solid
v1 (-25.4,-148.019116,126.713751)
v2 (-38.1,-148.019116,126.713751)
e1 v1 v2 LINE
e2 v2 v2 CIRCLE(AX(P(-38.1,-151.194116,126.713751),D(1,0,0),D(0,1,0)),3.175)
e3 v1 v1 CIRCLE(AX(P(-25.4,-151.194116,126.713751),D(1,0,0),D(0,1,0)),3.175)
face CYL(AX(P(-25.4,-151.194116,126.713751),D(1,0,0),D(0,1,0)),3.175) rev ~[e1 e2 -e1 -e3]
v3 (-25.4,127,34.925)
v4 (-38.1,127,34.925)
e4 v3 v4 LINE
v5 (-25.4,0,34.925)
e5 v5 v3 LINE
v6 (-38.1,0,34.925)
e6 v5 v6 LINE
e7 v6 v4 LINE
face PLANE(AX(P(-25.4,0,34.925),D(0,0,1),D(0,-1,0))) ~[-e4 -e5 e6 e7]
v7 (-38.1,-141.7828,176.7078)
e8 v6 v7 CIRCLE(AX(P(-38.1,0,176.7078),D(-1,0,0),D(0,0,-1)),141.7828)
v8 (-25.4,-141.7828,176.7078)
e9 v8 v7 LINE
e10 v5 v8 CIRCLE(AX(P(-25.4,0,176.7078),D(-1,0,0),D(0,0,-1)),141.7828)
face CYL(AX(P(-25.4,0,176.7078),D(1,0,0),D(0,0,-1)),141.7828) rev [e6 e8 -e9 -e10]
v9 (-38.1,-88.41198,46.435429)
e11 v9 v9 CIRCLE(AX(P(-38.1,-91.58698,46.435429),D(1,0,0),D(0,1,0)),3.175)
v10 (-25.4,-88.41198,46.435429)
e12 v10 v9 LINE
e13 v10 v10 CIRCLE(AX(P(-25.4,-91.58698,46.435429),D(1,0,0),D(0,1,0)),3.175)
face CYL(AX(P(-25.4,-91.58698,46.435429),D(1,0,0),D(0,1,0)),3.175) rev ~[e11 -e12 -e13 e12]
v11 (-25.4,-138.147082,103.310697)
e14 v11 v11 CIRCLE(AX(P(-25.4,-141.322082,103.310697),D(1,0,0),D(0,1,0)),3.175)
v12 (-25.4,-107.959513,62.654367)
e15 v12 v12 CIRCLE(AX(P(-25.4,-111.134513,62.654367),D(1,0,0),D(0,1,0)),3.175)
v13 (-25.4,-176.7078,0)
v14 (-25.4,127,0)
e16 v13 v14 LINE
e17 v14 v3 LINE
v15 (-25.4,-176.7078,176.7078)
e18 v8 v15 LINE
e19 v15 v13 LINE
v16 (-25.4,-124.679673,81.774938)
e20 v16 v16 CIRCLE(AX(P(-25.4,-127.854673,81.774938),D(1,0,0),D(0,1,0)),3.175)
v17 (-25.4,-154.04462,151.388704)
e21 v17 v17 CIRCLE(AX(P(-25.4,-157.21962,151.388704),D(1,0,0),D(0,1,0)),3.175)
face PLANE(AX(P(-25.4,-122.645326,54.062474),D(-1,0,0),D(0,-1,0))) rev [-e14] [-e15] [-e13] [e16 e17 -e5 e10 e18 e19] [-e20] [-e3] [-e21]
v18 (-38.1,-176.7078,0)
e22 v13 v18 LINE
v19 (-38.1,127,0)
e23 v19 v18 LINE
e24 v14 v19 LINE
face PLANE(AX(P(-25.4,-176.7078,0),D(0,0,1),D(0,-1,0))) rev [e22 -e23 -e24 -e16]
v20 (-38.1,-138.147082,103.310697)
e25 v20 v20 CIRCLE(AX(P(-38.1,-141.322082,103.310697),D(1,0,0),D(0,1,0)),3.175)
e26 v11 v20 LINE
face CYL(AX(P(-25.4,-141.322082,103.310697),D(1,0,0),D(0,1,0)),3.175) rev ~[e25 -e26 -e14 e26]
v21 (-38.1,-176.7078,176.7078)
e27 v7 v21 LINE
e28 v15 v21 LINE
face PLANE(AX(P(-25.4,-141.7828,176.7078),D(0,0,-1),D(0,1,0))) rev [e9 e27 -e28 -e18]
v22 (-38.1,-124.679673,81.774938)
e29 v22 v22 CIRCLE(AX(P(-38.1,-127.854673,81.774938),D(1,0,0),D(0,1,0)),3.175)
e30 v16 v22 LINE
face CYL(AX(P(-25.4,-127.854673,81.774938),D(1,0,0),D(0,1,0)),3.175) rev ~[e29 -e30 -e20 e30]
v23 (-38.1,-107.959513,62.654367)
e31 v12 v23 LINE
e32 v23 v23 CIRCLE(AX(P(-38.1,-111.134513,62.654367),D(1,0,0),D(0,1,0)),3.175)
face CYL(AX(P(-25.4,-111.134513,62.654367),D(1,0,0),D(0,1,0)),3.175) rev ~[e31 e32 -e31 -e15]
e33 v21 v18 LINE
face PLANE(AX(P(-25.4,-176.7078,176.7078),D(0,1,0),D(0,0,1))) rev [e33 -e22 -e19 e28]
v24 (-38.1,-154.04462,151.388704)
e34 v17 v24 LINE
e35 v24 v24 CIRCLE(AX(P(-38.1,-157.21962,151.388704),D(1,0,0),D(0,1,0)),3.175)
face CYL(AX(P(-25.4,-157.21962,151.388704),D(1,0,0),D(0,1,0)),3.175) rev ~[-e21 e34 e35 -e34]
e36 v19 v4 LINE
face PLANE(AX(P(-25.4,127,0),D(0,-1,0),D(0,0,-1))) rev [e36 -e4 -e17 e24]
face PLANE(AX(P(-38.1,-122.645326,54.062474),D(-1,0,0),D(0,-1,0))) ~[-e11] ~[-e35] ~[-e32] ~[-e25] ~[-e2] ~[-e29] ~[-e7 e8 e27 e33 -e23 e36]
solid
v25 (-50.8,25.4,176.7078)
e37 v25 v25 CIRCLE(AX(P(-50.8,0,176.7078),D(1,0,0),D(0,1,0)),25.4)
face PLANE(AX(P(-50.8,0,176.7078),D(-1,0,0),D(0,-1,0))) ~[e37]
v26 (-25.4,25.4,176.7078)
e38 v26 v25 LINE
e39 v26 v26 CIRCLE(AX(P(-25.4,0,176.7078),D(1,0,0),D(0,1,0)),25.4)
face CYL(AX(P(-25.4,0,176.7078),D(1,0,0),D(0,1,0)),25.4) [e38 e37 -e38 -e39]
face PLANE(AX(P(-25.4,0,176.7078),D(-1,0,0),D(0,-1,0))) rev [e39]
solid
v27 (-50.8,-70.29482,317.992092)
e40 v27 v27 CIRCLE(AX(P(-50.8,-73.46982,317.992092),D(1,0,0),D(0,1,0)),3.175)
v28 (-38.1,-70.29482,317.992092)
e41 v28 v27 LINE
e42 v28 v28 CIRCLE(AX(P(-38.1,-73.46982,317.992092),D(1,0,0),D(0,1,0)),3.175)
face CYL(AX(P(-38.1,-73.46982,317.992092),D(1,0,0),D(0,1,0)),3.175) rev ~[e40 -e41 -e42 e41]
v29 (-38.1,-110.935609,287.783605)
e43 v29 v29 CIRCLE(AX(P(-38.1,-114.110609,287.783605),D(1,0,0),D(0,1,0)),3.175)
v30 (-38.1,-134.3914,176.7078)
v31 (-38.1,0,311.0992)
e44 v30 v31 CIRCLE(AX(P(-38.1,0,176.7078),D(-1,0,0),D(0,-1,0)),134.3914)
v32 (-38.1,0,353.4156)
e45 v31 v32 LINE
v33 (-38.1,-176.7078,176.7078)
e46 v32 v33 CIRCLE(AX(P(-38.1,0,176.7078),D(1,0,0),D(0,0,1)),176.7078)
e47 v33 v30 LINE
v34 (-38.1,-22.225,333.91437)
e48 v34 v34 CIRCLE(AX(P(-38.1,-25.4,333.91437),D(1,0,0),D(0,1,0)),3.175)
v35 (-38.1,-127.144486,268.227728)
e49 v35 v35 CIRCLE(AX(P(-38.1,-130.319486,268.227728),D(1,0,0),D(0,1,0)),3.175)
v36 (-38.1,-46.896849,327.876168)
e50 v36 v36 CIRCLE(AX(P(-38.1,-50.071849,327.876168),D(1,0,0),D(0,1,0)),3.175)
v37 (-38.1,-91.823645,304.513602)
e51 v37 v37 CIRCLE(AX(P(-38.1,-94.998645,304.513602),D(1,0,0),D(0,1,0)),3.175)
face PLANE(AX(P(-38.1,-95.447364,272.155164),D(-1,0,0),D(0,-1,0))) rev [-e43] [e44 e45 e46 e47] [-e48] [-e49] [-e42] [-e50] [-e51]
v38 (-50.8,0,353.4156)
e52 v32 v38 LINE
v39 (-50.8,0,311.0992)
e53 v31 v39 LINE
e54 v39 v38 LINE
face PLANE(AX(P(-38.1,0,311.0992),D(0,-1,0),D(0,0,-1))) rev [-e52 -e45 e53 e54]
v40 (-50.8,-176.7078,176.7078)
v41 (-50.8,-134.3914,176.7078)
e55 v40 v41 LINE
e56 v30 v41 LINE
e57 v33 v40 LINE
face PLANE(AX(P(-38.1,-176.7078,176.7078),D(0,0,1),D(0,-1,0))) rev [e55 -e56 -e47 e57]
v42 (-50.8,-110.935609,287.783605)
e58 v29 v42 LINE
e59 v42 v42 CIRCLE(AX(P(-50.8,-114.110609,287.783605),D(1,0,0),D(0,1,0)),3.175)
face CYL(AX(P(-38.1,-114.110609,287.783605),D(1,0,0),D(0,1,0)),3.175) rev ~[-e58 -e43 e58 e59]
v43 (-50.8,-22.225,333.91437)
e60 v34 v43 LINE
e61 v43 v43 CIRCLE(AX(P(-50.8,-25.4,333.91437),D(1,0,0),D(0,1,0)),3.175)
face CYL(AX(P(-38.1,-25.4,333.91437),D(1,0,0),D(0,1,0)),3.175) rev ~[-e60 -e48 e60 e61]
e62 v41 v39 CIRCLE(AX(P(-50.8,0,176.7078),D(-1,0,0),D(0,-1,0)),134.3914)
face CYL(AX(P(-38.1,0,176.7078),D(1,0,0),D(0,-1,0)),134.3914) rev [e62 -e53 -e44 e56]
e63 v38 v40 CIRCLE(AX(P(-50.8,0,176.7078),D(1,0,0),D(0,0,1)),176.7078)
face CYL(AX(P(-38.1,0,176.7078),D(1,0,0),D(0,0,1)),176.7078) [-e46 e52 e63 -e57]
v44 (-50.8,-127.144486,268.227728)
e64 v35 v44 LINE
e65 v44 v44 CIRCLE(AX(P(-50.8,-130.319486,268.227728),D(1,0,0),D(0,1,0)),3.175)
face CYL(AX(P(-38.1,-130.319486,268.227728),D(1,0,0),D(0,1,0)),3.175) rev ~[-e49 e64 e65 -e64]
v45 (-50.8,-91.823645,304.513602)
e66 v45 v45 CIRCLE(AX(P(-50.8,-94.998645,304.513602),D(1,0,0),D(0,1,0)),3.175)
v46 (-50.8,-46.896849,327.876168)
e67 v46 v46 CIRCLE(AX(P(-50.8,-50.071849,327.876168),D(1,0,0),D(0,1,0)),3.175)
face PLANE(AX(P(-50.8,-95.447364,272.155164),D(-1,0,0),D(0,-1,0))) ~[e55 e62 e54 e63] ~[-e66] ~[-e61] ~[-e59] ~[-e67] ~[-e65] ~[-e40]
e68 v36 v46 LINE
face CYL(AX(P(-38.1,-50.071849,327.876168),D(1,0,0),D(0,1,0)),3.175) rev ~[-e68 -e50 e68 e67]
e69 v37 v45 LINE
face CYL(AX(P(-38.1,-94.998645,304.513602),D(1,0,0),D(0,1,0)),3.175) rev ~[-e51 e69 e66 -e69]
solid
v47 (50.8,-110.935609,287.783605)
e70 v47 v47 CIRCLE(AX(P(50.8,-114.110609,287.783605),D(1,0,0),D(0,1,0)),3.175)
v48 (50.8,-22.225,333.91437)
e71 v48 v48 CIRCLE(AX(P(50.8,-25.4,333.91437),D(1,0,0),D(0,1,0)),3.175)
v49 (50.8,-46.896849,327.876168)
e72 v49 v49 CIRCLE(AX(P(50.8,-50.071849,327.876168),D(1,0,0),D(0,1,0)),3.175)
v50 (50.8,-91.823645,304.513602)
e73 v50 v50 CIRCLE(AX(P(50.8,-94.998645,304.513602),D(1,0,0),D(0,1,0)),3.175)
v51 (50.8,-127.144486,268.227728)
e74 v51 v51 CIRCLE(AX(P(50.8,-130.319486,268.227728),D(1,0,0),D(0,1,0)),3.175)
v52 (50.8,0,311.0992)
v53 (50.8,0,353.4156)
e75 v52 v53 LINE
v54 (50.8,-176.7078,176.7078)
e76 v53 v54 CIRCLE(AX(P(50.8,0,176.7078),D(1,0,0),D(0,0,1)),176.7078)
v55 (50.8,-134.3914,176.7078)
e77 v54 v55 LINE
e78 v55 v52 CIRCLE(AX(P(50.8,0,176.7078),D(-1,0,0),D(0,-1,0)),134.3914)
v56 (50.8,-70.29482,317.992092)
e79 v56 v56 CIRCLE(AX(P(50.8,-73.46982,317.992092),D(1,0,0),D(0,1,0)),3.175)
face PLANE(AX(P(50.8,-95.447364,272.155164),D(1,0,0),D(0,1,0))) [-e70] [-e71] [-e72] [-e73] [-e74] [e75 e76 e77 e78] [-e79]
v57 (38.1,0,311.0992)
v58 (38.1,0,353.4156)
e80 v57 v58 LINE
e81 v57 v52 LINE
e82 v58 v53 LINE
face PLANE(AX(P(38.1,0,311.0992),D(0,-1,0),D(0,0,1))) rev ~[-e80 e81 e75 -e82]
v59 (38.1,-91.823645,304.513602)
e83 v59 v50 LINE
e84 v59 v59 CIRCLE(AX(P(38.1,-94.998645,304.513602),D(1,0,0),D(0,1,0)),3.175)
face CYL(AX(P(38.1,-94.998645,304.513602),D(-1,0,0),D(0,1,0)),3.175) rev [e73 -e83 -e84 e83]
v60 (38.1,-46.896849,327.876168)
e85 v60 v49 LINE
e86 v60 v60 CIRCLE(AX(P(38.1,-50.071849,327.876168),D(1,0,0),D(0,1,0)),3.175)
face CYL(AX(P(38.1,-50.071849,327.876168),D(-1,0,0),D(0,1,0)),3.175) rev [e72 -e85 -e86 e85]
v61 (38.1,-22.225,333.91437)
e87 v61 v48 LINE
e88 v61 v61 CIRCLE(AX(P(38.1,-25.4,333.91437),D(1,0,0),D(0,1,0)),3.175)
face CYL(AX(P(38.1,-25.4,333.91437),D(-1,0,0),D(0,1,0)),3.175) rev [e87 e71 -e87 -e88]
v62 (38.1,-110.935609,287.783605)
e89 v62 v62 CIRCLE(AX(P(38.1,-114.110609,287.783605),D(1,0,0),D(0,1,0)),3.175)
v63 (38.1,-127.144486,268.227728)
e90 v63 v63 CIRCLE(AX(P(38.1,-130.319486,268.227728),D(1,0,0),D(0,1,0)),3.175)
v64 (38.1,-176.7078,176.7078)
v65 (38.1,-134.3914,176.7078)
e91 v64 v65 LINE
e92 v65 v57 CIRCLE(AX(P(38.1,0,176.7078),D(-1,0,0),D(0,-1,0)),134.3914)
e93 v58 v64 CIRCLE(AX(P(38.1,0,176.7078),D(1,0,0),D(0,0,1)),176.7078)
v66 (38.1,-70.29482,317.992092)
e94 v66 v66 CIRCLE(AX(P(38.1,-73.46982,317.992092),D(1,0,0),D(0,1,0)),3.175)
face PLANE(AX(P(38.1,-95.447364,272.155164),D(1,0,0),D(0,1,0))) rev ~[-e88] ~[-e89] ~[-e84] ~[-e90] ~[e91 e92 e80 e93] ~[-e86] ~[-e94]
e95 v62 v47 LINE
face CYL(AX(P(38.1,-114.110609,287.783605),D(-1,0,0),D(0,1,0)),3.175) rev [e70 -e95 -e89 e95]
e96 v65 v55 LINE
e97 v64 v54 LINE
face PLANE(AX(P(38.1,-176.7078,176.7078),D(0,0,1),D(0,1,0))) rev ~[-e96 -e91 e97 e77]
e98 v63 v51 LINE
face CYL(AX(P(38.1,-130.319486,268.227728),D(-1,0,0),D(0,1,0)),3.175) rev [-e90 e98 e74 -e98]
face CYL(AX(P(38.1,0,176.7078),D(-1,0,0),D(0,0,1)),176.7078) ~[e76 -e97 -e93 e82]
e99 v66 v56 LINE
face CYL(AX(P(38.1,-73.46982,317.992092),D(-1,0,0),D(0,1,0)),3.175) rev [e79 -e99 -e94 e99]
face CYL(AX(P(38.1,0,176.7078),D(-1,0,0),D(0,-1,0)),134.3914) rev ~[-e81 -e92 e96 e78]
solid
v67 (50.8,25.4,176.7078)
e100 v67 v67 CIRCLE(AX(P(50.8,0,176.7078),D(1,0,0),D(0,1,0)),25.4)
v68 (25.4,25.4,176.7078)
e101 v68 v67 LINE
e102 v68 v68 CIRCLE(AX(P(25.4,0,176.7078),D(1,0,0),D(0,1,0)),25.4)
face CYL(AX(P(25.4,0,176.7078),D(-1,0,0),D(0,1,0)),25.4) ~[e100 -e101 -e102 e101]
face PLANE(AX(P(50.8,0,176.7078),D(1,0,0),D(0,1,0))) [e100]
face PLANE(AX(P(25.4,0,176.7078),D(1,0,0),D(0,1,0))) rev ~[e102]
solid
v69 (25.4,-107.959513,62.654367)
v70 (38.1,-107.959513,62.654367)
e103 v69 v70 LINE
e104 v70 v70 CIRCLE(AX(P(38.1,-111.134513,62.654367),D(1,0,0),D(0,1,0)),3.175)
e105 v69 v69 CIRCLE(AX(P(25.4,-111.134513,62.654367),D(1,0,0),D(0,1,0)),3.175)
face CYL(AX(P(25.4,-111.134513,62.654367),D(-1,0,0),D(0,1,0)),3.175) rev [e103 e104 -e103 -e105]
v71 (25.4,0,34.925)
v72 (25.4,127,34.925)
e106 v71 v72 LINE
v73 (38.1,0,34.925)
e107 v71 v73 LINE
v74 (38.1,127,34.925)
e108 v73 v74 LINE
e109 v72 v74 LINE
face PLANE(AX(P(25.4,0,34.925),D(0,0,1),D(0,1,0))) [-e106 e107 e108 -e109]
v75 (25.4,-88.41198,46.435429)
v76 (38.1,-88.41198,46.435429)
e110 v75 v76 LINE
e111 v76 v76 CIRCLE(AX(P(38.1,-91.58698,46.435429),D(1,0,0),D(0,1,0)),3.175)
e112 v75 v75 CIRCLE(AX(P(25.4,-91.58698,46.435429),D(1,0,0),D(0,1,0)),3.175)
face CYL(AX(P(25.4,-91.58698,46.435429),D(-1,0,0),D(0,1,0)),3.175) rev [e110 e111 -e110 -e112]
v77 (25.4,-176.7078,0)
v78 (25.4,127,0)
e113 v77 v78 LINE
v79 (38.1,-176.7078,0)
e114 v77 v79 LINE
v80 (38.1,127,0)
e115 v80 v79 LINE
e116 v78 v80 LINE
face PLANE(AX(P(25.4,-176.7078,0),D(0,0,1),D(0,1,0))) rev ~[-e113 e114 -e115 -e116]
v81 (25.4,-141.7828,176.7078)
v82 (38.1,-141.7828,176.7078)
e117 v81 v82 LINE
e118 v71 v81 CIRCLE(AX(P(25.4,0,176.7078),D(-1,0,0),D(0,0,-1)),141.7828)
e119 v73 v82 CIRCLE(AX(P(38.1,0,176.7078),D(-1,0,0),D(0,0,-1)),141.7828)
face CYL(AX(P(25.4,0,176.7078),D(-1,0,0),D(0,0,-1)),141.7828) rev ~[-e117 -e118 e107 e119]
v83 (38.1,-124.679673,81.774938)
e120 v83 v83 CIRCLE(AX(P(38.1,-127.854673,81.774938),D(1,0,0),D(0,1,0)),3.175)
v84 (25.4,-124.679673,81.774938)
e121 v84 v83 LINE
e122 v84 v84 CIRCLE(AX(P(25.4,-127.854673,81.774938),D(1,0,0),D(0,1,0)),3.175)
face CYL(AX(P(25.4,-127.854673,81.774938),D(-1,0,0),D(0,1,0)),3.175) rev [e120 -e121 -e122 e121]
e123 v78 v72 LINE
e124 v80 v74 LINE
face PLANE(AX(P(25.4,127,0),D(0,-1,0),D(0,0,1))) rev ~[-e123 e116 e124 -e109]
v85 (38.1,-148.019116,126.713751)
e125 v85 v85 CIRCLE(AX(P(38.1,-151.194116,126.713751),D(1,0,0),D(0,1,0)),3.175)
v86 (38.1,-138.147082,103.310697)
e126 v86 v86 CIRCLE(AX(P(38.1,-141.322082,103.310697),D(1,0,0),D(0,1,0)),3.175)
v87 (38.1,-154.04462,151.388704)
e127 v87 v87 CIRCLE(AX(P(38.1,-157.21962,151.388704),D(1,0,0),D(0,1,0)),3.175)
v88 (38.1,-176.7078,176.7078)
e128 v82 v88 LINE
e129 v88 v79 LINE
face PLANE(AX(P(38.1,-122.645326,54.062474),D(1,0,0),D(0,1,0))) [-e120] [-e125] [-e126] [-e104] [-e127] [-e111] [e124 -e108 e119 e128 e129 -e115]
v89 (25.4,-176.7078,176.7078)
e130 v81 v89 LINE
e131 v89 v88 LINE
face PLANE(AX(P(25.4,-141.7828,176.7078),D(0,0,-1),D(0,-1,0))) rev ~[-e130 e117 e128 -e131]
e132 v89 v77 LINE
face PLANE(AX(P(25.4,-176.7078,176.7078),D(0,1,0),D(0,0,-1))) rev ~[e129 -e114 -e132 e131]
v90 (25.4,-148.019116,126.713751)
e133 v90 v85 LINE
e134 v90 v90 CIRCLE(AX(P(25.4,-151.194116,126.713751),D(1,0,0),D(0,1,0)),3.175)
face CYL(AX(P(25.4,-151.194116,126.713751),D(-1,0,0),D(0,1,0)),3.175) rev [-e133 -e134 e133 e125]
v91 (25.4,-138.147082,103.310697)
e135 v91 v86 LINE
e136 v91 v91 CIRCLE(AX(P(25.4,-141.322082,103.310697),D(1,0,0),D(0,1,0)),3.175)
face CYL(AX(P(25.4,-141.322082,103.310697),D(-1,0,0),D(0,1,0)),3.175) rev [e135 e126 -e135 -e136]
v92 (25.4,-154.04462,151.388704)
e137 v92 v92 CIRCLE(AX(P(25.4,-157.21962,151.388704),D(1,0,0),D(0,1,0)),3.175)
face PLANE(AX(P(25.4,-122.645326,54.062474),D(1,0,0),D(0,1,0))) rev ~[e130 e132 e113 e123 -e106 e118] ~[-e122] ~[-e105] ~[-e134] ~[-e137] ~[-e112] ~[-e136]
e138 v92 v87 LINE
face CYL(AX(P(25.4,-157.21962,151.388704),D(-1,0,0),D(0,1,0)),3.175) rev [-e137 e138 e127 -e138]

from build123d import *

# Parameters (mm, degrees)
F4_R      = 25.4
F5_DEPTH  = 25.4
F4_R_2    = 3.175
F4_W      = 127
F4_H      = 34.925
F6_DEPTH  = 12.7
F7_DEPTH  = 12.7
F9_R      = 3.175
F10_DEPTH = 12.7


# Not quite as in the source:
# - a variable given as a bare number and used for a length is read in inches; the dataset says mm whatever the document's units were


with BuildPart() as f5:
    # F4 (on offset) → F5 (new body)
    with BuildSketch(Plane.YZ.offset(25.4)):
        with Locations((0, 176.7078)):
            Circle(F4_R)
    extrude(amount=F5_DEPTH)


with BuildPart() as f6:
    # F4 (on offset) → F6 (new body)
    with BuildSketch(Plane.YZ.offset(25.4)):
        with BuildLine():
            ThreePointArc((-176.7078, 176.7078), (-124.9512836686, 51.7565163314), (0, 0))
            Line((0, 0), (0, 34.925))
            ThreePointArc((0, 34.925), (-100.2555793356, 76.4522206644), (-141.7828, 176.7078))
            Line((-141.7828, 176.7078), (-176.7078, 176.7078))
        make_face()
        with Locations((-91.5869799801, 46.4354289069)):
            Circle(F4_R_2, mode=Mode.SUBTRACT)
        with Locations((-111.1345130262, 62.6543669675)):
            Circle(F4_R_2, mode=Mode.SUBTRACT)
        with Locations((-127.8546728705, 81.7749384752)):
            Circle(F4_R_2, mode=Mode.SUBTRACT)
        with Locations((-141.3220819177, 103.3106969609)):
            Circle(F4_R_2, mode=Mode.SUBTRACT)
        with Locations((-151.1941158077, 126.713751182)):
            Circle(F4_R_2, mode=Mode.SUBTRACT)
        with Locations((-157.2196201212, 151.3887040243)):
            Circle(F4_R_2, mode=Mode.SUBTRACT)
        with Locations((63.5, 17.4625)):
            Rectangle(F4_W, F4_H)
    extrude(amount=F6_DEPTH)

    # F4 (on offset) → F7 (join)
    with BuildSketch(Plane.YZ.offset(25.4)):
        with BuildLine():
            Line((-176.7078, 0), (0, 0))
            ThreePointArc((0, 0), (-124.9512836686, 51.7565163314), (-176.7078, 176.7078))
            Line((-176.7078, 176.7078), (-176.7078, 0))
        make_face()
    extrude(amount=F7_DEPTH)


with BuildPart() as f10:
    # F9 (on offset) → F10 (new body)
    with BuildSketch(Plane.YZ.offset(38.1)):
        with BuildLine():
            ThreePointArc((-134.3914, 176.7078), (-95.0290702732, 271.7368702732), (0, 311.0992))
            Line((0, 311.0992), (0, 353.4156))
            ThreePointArc((0, 353.4156), (-124.9512836686, 301.6590836686), (-176.7078, 176.7078))
            Line((-176.7078, 176.7078), (-134.3914, 176.7078))
        make_face()
        with Locations((-130.3194857616, 268.2277279005)):
            Circle(F9_R, mode=Mode.SUBTRACT)
        with Locations((-114.1106092778, 287.7836048467)):
            Circle(F9_R, mode=Mode.SUBTRACT)
        with Locations((-94.9986447259, 304.5136021857)):
            Circle(F9_R, mode=Mode.SUBTRACT)
        with Locations((-73.4698196056, 317.992092047)):
            Circle(F9_R, mode=Mode.SUBTRACT)
        with Locations((-50.0718487676, 327.8761681631)):
            Circle(F9_R, mode=Mode.SUBTRACT)
        with Locations((-25.4, 333.9143697485)):
            Circle(F9_R, mode=Mode.SUBTRACT)
    extrude(amount=F10_DEPTH)


with BuildPart() as f11_1:
    # F11: instance of F10
    add(f10.part.mirror(Plane.YZ))


with BuildPart() as f11_2:
    # F11: instance of F5
    add(f5.part.mirror(Plane.YZ))


with BuildPart() as f11_3:
    # F11: instance of F6
    add(f6.part.mirror(Plane.YZ))


solid = Compound([f5.part, f6.part, f10.part, f11_1.part, f11_2.part, f11_3.part])
